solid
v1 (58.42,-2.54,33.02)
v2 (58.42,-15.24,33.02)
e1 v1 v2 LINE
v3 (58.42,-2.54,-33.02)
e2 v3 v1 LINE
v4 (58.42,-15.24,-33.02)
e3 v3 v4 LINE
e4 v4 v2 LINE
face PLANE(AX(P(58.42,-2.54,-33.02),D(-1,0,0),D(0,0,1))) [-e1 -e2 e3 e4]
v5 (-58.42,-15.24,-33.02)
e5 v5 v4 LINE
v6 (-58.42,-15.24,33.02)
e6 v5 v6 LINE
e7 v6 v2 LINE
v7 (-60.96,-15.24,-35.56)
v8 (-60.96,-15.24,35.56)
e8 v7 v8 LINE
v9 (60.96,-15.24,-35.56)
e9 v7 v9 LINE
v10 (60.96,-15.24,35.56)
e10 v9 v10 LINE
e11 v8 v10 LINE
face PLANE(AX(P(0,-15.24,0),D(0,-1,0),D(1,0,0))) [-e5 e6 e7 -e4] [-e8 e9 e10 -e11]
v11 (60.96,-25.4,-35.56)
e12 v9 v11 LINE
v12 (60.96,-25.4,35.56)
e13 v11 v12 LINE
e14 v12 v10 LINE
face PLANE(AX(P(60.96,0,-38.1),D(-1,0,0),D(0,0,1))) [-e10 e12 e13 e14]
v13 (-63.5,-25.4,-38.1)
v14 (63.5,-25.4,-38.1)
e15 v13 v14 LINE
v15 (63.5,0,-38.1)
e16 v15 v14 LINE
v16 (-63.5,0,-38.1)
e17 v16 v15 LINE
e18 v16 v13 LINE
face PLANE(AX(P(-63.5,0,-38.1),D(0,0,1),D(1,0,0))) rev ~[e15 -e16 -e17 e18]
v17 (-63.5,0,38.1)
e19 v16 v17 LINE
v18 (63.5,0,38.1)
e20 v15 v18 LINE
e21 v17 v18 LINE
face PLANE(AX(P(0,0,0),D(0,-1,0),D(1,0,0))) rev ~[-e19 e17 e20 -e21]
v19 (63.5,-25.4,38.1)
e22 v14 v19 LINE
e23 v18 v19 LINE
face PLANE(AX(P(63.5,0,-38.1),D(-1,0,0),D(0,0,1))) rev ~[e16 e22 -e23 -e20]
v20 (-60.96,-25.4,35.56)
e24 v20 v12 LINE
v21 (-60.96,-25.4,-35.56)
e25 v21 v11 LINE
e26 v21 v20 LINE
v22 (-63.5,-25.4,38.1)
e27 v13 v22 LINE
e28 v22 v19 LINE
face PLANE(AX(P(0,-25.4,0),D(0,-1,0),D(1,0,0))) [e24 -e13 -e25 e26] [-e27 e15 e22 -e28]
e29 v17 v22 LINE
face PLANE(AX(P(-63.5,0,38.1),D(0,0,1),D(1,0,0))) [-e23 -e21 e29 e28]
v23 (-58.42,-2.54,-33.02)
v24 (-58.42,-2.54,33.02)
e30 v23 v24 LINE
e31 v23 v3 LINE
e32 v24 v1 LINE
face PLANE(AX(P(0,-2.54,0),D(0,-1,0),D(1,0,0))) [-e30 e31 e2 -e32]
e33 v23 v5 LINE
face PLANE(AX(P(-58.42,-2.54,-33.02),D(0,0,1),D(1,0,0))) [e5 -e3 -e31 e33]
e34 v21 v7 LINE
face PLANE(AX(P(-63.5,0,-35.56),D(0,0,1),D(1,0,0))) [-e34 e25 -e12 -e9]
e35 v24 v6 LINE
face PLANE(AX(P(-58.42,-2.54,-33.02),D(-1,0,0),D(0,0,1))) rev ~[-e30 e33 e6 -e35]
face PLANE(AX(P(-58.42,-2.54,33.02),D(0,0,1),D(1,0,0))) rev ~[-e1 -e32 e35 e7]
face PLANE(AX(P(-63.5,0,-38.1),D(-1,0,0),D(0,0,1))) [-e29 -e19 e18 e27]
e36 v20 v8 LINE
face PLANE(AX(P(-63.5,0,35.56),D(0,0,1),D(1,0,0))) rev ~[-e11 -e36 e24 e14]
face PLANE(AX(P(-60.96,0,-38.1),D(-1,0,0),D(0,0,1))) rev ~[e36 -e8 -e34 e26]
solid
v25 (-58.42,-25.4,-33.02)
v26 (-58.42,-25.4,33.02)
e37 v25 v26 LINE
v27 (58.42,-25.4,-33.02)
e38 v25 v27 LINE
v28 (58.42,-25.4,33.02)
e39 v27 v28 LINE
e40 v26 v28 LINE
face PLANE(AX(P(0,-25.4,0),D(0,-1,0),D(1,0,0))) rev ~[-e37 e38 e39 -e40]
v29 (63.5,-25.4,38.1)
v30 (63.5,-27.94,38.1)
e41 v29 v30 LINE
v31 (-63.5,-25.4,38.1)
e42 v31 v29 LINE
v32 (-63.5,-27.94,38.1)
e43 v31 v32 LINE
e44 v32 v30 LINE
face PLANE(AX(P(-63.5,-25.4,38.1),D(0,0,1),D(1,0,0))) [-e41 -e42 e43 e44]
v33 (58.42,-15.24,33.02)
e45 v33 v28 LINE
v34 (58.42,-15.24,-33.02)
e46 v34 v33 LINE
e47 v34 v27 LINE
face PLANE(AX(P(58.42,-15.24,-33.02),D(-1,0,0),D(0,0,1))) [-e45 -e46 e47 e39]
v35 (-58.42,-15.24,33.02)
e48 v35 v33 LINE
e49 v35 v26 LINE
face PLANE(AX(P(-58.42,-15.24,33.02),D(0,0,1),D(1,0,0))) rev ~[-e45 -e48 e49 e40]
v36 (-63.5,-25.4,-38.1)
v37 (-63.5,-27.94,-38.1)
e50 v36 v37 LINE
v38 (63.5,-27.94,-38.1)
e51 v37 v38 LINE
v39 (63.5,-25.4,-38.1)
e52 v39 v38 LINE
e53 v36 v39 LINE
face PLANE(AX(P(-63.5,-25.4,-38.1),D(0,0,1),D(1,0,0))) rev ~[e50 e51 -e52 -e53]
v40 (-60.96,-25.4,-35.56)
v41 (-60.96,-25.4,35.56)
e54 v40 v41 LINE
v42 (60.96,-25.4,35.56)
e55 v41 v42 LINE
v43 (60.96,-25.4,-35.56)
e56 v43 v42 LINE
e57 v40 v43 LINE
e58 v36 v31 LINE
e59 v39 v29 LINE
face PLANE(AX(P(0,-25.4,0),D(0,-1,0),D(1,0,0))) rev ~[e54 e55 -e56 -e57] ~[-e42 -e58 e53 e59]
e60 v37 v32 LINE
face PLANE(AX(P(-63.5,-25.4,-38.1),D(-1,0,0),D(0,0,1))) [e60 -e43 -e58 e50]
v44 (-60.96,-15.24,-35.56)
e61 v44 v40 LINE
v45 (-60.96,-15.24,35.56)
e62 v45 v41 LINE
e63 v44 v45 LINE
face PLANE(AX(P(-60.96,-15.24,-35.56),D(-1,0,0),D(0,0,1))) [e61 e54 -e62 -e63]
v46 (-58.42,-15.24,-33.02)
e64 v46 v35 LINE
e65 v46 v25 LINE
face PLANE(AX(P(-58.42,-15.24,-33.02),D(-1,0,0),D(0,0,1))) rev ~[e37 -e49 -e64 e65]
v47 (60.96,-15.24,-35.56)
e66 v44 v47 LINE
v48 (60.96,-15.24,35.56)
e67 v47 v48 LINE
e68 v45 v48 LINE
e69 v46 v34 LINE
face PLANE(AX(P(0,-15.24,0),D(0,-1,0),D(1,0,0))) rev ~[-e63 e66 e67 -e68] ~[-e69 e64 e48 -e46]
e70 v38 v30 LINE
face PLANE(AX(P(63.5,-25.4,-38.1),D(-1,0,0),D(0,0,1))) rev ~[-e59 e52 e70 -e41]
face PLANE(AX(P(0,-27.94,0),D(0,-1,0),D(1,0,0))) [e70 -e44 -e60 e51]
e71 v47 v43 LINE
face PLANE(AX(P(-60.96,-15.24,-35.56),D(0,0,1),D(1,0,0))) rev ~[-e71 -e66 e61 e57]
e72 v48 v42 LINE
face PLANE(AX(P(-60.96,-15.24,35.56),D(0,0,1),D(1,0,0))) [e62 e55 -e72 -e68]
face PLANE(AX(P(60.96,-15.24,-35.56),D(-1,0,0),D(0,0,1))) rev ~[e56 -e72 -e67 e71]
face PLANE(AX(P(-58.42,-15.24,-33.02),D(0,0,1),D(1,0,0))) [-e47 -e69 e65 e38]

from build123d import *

# Parameters (mm, degrees)
F4_W     = 127
F4_H     = 76.2
F5_DEPTH = 25.4
F6_T     = -2.54
F0_W     = 121.92
F0_H     = 71.12
F0_W_2   = 116.84
F0_H_2   = 66.04
F1_DEPTH = 12.7
F2_DEPTH = 10.16
F3_W     = 127
F3_H     = 76.2
F7_DEPTH = 2.54


with BuildPart() as f5:
    # F4 (on Front) → F5 (new body)
    with BuildSketch(Plane.XZ):
        Rectangle(F4_W, F4_H)
    extrude(amount=F5_DEPTH)

    # F6
    f6_openings = [f5.faces().sort_by_distance(p)[0] for p in [
        (0, -25.4, 0),
    ]]
    offset(amount=F6_T, openings=f6_openings)

    # F0 (on face) → F1 (join)
    with BuildSketch(Plane.XZ.offset(2.54)):
        Rectangle(F0_W, F0_H)
        Rectangle(F0_W_2, F0_H_2, mode=Mode.SUBTRACT)
    extrude(amount=F1_DEPTH)


with BuildPart() as f2:
    # F2 (new): a face of the model
    f2_faces = [f5.part.faces().sort_by_distance(p)[0] for p in [
        (59.5485276907, -15.24, 0),
    ]]
    extrude(f2_faces, amount=F2_DEPTH)

    # F3 (on face) → F7 (join)
    with BuildSketch(Plane.XZ.offset(25.4)):
        Rectangle(F3_W, F3_H)
    extrude(amount=F7_DEPTH)


solid = Compound([f5.part, f2.part])
